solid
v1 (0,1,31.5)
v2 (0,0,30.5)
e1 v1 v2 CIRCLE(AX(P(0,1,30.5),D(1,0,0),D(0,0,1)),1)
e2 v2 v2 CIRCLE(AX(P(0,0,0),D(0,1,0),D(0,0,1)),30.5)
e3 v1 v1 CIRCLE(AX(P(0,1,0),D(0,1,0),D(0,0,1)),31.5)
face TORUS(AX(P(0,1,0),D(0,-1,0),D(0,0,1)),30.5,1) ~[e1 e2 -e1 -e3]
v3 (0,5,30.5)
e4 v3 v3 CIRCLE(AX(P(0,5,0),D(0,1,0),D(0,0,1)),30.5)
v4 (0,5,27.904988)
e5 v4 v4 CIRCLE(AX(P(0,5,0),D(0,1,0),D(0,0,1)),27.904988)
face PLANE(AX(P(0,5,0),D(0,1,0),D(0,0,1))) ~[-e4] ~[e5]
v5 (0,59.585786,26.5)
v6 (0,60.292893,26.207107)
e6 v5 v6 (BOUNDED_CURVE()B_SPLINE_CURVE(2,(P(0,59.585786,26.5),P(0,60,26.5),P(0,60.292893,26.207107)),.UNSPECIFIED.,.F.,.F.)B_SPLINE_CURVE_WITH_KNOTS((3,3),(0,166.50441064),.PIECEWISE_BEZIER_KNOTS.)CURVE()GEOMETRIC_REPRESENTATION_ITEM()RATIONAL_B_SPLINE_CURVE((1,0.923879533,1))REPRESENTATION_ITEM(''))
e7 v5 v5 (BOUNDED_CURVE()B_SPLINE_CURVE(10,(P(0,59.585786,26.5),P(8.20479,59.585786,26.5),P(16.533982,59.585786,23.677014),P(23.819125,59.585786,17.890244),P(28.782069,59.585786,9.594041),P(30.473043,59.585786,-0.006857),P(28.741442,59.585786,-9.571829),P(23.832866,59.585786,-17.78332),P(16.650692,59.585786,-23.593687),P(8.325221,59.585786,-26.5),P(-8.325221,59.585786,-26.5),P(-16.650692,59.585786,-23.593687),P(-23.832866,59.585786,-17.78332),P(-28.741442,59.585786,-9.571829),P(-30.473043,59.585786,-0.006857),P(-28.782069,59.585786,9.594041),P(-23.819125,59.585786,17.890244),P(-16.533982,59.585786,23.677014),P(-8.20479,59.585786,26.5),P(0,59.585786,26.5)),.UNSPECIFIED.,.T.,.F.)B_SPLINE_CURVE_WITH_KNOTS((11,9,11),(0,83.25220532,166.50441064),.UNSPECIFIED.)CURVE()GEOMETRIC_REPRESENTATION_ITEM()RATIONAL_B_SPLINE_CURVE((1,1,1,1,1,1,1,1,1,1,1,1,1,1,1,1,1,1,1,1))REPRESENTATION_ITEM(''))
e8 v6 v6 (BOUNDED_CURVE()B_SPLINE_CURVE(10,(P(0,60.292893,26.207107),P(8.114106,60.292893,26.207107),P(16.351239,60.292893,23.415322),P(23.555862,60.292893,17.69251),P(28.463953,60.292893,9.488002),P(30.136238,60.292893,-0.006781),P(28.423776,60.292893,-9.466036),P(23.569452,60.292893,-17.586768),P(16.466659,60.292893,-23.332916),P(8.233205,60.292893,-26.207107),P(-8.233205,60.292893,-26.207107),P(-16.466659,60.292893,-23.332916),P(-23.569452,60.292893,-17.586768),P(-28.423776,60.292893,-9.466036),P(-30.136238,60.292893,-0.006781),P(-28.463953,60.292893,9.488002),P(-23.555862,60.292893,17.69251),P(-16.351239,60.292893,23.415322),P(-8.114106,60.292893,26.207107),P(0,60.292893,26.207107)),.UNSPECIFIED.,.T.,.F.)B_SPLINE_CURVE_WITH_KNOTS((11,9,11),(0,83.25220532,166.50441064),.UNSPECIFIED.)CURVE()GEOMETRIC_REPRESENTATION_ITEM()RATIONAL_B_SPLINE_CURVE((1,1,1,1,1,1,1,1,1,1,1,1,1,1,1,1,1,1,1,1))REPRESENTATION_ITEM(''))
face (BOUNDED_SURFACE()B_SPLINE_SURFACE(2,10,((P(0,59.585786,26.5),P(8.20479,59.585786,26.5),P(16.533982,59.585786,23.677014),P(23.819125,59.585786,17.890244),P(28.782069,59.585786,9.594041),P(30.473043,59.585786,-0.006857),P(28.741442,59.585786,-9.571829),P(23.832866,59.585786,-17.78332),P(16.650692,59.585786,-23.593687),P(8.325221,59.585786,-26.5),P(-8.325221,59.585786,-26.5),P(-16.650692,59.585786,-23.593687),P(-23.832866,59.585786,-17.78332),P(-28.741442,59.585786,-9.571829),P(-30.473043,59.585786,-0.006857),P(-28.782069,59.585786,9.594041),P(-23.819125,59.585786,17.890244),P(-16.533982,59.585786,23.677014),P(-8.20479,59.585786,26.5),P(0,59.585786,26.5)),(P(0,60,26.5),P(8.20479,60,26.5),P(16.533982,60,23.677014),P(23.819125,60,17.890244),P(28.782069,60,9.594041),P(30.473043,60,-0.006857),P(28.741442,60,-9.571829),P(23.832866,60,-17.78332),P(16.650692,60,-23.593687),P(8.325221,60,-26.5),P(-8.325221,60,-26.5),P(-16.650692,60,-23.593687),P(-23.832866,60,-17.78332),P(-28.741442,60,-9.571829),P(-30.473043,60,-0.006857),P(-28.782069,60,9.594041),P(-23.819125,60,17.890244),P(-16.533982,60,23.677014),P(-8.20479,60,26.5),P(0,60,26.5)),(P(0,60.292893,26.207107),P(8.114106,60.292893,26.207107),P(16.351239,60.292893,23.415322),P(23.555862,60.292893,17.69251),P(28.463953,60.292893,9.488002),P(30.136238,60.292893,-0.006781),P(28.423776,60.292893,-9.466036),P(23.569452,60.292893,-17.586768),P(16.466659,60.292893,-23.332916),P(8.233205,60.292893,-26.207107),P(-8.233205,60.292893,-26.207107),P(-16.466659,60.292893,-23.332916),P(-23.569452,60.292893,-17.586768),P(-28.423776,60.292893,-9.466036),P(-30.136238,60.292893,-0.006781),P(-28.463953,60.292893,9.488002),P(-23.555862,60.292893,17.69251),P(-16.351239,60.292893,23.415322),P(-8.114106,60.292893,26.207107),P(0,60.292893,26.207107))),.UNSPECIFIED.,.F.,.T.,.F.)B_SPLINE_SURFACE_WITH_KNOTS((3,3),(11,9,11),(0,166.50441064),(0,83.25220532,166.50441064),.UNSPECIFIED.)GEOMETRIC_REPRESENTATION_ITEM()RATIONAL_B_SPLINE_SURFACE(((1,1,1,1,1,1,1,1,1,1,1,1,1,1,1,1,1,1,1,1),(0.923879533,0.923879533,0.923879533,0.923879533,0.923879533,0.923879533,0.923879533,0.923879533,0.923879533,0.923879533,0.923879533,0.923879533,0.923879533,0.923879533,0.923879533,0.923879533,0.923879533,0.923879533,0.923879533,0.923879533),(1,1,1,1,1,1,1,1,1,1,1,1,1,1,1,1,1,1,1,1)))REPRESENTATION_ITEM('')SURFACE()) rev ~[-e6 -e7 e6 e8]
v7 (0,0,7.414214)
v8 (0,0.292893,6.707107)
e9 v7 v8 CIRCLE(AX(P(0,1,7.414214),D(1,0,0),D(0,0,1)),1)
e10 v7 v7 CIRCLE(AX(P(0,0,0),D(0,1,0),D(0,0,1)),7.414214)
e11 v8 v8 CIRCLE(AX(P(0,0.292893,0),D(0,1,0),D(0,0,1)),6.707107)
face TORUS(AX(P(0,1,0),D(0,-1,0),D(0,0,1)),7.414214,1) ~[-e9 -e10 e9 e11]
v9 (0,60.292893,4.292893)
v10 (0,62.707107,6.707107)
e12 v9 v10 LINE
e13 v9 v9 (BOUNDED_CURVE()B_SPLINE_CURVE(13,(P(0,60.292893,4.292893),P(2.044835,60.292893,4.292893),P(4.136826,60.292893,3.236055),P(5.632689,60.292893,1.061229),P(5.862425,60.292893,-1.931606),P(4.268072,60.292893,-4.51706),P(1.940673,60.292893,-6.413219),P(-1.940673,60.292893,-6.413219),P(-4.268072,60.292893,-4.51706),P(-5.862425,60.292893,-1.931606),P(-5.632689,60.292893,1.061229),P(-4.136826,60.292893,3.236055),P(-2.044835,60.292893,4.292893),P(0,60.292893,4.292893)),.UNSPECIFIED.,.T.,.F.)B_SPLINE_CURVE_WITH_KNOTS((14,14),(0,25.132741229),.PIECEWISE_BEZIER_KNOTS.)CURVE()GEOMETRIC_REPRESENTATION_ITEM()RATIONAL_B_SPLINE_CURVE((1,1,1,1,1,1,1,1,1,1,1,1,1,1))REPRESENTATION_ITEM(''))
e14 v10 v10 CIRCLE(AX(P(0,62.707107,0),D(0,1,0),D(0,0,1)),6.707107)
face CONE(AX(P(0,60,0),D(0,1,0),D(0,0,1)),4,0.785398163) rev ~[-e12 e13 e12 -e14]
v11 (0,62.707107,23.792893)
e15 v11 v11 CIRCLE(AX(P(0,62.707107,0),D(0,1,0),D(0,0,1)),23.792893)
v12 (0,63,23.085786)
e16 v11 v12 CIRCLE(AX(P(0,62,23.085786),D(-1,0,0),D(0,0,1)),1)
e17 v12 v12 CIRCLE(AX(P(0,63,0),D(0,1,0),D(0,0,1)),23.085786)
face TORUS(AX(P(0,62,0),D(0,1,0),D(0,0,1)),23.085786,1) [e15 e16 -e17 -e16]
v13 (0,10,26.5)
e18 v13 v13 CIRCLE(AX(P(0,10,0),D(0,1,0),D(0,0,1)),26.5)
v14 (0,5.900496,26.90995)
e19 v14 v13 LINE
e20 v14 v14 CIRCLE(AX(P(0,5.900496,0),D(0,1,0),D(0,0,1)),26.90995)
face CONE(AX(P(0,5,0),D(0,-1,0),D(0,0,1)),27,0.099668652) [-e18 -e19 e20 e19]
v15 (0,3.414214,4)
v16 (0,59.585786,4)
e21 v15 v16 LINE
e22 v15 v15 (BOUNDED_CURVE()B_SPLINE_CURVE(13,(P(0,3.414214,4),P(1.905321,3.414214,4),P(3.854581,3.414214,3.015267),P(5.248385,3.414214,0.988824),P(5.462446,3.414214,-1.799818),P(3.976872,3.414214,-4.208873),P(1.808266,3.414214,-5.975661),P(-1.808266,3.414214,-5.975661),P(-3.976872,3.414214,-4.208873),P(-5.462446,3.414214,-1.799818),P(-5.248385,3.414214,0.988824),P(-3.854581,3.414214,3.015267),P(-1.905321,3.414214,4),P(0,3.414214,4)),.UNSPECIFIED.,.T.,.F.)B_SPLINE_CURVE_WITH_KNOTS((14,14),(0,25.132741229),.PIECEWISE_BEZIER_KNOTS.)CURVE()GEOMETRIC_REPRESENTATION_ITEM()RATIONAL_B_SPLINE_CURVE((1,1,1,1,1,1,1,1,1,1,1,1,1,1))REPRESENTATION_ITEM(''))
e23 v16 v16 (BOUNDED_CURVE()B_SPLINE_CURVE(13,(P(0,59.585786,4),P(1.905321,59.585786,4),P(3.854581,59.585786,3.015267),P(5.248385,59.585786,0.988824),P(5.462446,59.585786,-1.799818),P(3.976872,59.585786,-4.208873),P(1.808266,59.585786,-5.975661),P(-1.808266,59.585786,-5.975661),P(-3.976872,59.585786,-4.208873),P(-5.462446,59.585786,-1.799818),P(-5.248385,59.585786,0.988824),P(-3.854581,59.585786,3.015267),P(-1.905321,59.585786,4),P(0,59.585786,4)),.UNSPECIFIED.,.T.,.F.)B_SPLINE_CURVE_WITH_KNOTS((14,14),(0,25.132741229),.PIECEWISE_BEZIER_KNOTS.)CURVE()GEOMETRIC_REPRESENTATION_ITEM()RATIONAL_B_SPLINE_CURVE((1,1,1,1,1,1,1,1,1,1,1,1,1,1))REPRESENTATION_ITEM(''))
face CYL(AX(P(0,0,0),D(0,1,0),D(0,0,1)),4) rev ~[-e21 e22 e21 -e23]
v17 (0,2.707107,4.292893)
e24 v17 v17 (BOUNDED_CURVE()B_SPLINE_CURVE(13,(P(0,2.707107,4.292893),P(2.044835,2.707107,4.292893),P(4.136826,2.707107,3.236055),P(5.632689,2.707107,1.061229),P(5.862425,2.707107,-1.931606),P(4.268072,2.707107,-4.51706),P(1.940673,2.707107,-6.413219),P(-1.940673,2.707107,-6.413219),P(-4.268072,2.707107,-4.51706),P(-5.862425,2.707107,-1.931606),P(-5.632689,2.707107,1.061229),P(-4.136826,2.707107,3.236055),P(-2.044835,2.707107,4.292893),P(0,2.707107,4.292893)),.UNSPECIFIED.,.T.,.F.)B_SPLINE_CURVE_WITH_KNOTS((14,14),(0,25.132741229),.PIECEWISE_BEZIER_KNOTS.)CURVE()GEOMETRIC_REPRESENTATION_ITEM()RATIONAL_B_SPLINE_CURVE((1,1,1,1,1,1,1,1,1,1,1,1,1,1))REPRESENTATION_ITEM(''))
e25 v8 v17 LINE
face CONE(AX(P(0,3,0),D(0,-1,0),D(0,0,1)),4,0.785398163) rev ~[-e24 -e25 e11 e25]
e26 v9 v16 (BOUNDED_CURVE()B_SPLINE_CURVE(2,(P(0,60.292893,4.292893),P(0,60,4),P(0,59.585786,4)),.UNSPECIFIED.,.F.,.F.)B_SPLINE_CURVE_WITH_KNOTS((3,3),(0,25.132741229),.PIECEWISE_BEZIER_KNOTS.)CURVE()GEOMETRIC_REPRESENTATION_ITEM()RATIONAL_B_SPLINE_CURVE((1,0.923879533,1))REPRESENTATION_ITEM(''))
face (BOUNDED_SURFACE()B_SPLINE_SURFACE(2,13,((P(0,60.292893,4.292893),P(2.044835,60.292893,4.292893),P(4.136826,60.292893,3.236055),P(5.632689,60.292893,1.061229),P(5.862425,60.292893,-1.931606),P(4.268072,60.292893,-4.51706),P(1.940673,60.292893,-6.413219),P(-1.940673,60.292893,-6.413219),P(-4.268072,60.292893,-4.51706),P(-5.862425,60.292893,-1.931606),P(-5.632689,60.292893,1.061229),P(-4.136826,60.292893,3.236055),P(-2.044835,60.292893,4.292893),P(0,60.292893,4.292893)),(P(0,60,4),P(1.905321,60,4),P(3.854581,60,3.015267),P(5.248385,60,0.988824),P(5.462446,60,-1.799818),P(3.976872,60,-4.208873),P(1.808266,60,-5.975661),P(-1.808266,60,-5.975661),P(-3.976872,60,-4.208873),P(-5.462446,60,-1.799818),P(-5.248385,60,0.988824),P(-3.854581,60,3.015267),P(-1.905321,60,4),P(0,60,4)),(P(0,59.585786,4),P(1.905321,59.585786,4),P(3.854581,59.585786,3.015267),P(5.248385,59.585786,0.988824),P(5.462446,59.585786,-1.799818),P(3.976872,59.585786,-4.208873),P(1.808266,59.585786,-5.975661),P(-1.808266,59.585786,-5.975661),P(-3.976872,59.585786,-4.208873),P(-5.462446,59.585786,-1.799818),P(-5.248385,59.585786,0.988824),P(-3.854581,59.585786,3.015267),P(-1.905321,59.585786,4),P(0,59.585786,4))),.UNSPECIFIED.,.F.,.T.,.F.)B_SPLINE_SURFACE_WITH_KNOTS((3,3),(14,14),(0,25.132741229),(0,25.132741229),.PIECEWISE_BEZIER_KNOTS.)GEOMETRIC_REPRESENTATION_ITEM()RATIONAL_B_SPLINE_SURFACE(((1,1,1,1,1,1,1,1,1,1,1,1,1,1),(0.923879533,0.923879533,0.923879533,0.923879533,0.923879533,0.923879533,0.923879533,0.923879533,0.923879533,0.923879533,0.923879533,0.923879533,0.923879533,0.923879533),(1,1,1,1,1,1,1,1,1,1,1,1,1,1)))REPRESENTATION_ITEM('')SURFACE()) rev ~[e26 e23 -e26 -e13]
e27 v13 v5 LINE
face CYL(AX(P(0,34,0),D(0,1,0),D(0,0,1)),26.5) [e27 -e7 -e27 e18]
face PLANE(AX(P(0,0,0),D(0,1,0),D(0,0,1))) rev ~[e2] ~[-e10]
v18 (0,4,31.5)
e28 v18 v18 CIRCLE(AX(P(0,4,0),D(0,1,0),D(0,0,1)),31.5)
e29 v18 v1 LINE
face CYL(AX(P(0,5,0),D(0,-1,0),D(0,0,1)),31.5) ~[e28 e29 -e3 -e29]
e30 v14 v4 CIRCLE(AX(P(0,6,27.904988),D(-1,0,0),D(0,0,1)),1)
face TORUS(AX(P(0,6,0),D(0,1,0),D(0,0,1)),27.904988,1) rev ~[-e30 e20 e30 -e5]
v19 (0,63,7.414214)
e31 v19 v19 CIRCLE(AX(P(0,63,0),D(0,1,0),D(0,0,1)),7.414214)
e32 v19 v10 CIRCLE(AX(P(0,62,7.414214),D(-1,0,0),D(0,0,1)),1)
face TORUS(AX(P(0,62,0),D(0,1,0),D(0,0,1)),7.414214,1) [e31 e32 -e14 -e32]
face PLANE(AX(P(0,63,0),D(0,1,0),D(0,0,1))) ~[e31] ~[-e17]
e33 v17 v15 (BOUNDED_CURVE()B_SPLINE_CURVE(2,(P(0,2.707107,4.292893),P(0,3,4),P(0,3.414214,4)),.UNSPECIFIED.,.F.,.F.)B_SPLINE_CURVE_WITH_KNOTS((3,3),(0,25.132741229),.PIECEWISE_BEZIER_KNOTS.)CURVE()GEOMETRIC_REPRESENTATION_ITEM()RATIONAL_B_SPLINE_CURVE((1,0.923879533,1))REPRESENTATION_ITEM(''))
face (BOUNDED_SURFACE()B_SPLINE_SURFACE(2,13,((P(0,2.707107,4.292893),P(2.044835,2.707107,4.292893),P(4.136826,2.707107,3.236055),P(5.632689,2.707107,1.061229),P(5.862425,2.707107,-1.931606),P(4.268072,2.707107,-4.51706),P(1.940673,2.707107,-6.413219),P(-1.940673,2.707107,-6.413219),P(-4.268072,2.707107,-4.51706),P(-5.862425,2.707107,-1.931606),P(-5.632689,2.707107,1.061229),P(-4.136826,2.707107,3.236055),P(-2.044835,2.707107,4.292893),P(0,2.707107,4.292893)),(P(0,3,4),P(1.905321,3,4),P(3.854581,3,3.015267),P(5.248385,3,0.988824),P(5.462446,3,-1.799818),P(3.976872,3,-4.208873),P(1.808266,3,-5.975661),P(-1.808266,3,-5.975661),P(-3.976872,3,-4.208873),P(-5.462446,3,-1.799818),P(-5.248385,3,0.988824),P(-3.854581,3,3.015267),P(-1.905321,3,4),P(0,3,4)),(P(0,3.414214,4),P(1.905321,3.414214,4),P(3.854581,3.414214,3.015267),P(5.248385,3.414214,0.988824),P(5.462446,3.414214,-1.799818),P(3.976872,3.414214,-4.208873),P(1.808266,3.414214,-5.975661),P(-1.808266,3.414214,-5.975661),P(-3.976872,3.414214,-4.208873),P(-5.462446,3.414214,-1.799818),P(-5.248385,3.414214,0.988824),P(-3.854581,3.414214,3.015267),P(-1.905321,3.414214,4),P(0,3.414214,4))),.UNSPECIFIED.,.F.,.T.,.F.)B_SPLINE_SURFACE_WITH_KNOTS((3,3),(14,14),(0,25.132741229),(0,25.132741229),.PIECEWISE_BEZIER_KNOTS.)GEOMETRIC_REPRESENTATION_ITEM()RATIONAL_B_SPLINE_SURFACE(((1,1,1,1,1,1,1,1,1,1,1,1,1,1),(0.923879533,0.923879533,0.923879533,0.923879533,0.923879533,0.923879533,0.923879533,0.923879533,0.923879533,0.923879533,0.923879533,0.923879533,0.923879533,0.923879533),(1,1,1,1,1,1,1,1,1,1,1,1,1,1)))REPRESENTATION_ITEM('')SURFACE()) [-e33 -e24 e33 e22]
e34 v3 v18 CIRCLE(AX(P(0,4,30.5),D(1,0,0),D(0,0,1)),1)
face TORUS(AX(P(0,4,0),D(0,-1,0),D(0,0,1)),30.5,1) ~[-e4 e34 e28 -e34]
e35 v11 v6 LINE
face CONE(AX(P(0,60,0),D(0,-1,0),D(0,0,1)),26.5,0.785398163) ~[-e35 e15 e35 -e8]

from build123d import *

# Parameters (mm, degrees)
F0_W    = 58
F0_H    = 22.5
F2_SIZE = 3
F4_R    = 1


# Not quite as in the source:
# - a fillet or chamfer that OpenCascade refuses, or shapes differently, is made with other operations: its cross-section is extruded or revolved along the edge and cut away or added


with BuildPart() as f1:
    # F0 (on Right) → F1 (revolve)
    with BuildSketch(Plane.YZ):
        Polygon((0, 31.5), (0, 4), (5, 4), (5, 26.5), (5, 31.5), align=None)
        with Locations((34, 15.25)):
            Rectangle(F0_W, F0_H)
    revolve(axis=Axis((0, 38.0806664313, 0), (0, 1, 0)))

    # F2
    f2_edges = [f1.edges().sort_by_distance(p)[0] for p in [
        (0, 63, -26.5),
        (0, 63, -4),
        (0, 0, -4),
    ]]
    chamfer(f2_edges, length=F2_SIZE)

    # F3: chamfer of 5 x 0.5 on 1 edges, made by hand

    # F3_s1 → F3_t2 (revolve)
    with BuildSketch(Plane.YZ):
        Polygon((5, 27), (10, 26.5), (5, 26.5), align=None)
    revolve(axis=Axis((0, 5, 0), (0, 1, 0)))

    # F4
    f4_edges = [f1.edges().sort_by_distance(p)[0] for p in [
        (0, 0, -31.5),
        (0, 5, -31.5),
        (0, 5, -27),
        (0, 60, -26.5),
        (0, 63, -23.5),
        (0, 60, -4),
        (0, 63, -7),
        (0, 0, -7),
        (0, 3, -4),
    ]]
    fillet(f4_edges, radius=F4_R)


solid = f1.part
